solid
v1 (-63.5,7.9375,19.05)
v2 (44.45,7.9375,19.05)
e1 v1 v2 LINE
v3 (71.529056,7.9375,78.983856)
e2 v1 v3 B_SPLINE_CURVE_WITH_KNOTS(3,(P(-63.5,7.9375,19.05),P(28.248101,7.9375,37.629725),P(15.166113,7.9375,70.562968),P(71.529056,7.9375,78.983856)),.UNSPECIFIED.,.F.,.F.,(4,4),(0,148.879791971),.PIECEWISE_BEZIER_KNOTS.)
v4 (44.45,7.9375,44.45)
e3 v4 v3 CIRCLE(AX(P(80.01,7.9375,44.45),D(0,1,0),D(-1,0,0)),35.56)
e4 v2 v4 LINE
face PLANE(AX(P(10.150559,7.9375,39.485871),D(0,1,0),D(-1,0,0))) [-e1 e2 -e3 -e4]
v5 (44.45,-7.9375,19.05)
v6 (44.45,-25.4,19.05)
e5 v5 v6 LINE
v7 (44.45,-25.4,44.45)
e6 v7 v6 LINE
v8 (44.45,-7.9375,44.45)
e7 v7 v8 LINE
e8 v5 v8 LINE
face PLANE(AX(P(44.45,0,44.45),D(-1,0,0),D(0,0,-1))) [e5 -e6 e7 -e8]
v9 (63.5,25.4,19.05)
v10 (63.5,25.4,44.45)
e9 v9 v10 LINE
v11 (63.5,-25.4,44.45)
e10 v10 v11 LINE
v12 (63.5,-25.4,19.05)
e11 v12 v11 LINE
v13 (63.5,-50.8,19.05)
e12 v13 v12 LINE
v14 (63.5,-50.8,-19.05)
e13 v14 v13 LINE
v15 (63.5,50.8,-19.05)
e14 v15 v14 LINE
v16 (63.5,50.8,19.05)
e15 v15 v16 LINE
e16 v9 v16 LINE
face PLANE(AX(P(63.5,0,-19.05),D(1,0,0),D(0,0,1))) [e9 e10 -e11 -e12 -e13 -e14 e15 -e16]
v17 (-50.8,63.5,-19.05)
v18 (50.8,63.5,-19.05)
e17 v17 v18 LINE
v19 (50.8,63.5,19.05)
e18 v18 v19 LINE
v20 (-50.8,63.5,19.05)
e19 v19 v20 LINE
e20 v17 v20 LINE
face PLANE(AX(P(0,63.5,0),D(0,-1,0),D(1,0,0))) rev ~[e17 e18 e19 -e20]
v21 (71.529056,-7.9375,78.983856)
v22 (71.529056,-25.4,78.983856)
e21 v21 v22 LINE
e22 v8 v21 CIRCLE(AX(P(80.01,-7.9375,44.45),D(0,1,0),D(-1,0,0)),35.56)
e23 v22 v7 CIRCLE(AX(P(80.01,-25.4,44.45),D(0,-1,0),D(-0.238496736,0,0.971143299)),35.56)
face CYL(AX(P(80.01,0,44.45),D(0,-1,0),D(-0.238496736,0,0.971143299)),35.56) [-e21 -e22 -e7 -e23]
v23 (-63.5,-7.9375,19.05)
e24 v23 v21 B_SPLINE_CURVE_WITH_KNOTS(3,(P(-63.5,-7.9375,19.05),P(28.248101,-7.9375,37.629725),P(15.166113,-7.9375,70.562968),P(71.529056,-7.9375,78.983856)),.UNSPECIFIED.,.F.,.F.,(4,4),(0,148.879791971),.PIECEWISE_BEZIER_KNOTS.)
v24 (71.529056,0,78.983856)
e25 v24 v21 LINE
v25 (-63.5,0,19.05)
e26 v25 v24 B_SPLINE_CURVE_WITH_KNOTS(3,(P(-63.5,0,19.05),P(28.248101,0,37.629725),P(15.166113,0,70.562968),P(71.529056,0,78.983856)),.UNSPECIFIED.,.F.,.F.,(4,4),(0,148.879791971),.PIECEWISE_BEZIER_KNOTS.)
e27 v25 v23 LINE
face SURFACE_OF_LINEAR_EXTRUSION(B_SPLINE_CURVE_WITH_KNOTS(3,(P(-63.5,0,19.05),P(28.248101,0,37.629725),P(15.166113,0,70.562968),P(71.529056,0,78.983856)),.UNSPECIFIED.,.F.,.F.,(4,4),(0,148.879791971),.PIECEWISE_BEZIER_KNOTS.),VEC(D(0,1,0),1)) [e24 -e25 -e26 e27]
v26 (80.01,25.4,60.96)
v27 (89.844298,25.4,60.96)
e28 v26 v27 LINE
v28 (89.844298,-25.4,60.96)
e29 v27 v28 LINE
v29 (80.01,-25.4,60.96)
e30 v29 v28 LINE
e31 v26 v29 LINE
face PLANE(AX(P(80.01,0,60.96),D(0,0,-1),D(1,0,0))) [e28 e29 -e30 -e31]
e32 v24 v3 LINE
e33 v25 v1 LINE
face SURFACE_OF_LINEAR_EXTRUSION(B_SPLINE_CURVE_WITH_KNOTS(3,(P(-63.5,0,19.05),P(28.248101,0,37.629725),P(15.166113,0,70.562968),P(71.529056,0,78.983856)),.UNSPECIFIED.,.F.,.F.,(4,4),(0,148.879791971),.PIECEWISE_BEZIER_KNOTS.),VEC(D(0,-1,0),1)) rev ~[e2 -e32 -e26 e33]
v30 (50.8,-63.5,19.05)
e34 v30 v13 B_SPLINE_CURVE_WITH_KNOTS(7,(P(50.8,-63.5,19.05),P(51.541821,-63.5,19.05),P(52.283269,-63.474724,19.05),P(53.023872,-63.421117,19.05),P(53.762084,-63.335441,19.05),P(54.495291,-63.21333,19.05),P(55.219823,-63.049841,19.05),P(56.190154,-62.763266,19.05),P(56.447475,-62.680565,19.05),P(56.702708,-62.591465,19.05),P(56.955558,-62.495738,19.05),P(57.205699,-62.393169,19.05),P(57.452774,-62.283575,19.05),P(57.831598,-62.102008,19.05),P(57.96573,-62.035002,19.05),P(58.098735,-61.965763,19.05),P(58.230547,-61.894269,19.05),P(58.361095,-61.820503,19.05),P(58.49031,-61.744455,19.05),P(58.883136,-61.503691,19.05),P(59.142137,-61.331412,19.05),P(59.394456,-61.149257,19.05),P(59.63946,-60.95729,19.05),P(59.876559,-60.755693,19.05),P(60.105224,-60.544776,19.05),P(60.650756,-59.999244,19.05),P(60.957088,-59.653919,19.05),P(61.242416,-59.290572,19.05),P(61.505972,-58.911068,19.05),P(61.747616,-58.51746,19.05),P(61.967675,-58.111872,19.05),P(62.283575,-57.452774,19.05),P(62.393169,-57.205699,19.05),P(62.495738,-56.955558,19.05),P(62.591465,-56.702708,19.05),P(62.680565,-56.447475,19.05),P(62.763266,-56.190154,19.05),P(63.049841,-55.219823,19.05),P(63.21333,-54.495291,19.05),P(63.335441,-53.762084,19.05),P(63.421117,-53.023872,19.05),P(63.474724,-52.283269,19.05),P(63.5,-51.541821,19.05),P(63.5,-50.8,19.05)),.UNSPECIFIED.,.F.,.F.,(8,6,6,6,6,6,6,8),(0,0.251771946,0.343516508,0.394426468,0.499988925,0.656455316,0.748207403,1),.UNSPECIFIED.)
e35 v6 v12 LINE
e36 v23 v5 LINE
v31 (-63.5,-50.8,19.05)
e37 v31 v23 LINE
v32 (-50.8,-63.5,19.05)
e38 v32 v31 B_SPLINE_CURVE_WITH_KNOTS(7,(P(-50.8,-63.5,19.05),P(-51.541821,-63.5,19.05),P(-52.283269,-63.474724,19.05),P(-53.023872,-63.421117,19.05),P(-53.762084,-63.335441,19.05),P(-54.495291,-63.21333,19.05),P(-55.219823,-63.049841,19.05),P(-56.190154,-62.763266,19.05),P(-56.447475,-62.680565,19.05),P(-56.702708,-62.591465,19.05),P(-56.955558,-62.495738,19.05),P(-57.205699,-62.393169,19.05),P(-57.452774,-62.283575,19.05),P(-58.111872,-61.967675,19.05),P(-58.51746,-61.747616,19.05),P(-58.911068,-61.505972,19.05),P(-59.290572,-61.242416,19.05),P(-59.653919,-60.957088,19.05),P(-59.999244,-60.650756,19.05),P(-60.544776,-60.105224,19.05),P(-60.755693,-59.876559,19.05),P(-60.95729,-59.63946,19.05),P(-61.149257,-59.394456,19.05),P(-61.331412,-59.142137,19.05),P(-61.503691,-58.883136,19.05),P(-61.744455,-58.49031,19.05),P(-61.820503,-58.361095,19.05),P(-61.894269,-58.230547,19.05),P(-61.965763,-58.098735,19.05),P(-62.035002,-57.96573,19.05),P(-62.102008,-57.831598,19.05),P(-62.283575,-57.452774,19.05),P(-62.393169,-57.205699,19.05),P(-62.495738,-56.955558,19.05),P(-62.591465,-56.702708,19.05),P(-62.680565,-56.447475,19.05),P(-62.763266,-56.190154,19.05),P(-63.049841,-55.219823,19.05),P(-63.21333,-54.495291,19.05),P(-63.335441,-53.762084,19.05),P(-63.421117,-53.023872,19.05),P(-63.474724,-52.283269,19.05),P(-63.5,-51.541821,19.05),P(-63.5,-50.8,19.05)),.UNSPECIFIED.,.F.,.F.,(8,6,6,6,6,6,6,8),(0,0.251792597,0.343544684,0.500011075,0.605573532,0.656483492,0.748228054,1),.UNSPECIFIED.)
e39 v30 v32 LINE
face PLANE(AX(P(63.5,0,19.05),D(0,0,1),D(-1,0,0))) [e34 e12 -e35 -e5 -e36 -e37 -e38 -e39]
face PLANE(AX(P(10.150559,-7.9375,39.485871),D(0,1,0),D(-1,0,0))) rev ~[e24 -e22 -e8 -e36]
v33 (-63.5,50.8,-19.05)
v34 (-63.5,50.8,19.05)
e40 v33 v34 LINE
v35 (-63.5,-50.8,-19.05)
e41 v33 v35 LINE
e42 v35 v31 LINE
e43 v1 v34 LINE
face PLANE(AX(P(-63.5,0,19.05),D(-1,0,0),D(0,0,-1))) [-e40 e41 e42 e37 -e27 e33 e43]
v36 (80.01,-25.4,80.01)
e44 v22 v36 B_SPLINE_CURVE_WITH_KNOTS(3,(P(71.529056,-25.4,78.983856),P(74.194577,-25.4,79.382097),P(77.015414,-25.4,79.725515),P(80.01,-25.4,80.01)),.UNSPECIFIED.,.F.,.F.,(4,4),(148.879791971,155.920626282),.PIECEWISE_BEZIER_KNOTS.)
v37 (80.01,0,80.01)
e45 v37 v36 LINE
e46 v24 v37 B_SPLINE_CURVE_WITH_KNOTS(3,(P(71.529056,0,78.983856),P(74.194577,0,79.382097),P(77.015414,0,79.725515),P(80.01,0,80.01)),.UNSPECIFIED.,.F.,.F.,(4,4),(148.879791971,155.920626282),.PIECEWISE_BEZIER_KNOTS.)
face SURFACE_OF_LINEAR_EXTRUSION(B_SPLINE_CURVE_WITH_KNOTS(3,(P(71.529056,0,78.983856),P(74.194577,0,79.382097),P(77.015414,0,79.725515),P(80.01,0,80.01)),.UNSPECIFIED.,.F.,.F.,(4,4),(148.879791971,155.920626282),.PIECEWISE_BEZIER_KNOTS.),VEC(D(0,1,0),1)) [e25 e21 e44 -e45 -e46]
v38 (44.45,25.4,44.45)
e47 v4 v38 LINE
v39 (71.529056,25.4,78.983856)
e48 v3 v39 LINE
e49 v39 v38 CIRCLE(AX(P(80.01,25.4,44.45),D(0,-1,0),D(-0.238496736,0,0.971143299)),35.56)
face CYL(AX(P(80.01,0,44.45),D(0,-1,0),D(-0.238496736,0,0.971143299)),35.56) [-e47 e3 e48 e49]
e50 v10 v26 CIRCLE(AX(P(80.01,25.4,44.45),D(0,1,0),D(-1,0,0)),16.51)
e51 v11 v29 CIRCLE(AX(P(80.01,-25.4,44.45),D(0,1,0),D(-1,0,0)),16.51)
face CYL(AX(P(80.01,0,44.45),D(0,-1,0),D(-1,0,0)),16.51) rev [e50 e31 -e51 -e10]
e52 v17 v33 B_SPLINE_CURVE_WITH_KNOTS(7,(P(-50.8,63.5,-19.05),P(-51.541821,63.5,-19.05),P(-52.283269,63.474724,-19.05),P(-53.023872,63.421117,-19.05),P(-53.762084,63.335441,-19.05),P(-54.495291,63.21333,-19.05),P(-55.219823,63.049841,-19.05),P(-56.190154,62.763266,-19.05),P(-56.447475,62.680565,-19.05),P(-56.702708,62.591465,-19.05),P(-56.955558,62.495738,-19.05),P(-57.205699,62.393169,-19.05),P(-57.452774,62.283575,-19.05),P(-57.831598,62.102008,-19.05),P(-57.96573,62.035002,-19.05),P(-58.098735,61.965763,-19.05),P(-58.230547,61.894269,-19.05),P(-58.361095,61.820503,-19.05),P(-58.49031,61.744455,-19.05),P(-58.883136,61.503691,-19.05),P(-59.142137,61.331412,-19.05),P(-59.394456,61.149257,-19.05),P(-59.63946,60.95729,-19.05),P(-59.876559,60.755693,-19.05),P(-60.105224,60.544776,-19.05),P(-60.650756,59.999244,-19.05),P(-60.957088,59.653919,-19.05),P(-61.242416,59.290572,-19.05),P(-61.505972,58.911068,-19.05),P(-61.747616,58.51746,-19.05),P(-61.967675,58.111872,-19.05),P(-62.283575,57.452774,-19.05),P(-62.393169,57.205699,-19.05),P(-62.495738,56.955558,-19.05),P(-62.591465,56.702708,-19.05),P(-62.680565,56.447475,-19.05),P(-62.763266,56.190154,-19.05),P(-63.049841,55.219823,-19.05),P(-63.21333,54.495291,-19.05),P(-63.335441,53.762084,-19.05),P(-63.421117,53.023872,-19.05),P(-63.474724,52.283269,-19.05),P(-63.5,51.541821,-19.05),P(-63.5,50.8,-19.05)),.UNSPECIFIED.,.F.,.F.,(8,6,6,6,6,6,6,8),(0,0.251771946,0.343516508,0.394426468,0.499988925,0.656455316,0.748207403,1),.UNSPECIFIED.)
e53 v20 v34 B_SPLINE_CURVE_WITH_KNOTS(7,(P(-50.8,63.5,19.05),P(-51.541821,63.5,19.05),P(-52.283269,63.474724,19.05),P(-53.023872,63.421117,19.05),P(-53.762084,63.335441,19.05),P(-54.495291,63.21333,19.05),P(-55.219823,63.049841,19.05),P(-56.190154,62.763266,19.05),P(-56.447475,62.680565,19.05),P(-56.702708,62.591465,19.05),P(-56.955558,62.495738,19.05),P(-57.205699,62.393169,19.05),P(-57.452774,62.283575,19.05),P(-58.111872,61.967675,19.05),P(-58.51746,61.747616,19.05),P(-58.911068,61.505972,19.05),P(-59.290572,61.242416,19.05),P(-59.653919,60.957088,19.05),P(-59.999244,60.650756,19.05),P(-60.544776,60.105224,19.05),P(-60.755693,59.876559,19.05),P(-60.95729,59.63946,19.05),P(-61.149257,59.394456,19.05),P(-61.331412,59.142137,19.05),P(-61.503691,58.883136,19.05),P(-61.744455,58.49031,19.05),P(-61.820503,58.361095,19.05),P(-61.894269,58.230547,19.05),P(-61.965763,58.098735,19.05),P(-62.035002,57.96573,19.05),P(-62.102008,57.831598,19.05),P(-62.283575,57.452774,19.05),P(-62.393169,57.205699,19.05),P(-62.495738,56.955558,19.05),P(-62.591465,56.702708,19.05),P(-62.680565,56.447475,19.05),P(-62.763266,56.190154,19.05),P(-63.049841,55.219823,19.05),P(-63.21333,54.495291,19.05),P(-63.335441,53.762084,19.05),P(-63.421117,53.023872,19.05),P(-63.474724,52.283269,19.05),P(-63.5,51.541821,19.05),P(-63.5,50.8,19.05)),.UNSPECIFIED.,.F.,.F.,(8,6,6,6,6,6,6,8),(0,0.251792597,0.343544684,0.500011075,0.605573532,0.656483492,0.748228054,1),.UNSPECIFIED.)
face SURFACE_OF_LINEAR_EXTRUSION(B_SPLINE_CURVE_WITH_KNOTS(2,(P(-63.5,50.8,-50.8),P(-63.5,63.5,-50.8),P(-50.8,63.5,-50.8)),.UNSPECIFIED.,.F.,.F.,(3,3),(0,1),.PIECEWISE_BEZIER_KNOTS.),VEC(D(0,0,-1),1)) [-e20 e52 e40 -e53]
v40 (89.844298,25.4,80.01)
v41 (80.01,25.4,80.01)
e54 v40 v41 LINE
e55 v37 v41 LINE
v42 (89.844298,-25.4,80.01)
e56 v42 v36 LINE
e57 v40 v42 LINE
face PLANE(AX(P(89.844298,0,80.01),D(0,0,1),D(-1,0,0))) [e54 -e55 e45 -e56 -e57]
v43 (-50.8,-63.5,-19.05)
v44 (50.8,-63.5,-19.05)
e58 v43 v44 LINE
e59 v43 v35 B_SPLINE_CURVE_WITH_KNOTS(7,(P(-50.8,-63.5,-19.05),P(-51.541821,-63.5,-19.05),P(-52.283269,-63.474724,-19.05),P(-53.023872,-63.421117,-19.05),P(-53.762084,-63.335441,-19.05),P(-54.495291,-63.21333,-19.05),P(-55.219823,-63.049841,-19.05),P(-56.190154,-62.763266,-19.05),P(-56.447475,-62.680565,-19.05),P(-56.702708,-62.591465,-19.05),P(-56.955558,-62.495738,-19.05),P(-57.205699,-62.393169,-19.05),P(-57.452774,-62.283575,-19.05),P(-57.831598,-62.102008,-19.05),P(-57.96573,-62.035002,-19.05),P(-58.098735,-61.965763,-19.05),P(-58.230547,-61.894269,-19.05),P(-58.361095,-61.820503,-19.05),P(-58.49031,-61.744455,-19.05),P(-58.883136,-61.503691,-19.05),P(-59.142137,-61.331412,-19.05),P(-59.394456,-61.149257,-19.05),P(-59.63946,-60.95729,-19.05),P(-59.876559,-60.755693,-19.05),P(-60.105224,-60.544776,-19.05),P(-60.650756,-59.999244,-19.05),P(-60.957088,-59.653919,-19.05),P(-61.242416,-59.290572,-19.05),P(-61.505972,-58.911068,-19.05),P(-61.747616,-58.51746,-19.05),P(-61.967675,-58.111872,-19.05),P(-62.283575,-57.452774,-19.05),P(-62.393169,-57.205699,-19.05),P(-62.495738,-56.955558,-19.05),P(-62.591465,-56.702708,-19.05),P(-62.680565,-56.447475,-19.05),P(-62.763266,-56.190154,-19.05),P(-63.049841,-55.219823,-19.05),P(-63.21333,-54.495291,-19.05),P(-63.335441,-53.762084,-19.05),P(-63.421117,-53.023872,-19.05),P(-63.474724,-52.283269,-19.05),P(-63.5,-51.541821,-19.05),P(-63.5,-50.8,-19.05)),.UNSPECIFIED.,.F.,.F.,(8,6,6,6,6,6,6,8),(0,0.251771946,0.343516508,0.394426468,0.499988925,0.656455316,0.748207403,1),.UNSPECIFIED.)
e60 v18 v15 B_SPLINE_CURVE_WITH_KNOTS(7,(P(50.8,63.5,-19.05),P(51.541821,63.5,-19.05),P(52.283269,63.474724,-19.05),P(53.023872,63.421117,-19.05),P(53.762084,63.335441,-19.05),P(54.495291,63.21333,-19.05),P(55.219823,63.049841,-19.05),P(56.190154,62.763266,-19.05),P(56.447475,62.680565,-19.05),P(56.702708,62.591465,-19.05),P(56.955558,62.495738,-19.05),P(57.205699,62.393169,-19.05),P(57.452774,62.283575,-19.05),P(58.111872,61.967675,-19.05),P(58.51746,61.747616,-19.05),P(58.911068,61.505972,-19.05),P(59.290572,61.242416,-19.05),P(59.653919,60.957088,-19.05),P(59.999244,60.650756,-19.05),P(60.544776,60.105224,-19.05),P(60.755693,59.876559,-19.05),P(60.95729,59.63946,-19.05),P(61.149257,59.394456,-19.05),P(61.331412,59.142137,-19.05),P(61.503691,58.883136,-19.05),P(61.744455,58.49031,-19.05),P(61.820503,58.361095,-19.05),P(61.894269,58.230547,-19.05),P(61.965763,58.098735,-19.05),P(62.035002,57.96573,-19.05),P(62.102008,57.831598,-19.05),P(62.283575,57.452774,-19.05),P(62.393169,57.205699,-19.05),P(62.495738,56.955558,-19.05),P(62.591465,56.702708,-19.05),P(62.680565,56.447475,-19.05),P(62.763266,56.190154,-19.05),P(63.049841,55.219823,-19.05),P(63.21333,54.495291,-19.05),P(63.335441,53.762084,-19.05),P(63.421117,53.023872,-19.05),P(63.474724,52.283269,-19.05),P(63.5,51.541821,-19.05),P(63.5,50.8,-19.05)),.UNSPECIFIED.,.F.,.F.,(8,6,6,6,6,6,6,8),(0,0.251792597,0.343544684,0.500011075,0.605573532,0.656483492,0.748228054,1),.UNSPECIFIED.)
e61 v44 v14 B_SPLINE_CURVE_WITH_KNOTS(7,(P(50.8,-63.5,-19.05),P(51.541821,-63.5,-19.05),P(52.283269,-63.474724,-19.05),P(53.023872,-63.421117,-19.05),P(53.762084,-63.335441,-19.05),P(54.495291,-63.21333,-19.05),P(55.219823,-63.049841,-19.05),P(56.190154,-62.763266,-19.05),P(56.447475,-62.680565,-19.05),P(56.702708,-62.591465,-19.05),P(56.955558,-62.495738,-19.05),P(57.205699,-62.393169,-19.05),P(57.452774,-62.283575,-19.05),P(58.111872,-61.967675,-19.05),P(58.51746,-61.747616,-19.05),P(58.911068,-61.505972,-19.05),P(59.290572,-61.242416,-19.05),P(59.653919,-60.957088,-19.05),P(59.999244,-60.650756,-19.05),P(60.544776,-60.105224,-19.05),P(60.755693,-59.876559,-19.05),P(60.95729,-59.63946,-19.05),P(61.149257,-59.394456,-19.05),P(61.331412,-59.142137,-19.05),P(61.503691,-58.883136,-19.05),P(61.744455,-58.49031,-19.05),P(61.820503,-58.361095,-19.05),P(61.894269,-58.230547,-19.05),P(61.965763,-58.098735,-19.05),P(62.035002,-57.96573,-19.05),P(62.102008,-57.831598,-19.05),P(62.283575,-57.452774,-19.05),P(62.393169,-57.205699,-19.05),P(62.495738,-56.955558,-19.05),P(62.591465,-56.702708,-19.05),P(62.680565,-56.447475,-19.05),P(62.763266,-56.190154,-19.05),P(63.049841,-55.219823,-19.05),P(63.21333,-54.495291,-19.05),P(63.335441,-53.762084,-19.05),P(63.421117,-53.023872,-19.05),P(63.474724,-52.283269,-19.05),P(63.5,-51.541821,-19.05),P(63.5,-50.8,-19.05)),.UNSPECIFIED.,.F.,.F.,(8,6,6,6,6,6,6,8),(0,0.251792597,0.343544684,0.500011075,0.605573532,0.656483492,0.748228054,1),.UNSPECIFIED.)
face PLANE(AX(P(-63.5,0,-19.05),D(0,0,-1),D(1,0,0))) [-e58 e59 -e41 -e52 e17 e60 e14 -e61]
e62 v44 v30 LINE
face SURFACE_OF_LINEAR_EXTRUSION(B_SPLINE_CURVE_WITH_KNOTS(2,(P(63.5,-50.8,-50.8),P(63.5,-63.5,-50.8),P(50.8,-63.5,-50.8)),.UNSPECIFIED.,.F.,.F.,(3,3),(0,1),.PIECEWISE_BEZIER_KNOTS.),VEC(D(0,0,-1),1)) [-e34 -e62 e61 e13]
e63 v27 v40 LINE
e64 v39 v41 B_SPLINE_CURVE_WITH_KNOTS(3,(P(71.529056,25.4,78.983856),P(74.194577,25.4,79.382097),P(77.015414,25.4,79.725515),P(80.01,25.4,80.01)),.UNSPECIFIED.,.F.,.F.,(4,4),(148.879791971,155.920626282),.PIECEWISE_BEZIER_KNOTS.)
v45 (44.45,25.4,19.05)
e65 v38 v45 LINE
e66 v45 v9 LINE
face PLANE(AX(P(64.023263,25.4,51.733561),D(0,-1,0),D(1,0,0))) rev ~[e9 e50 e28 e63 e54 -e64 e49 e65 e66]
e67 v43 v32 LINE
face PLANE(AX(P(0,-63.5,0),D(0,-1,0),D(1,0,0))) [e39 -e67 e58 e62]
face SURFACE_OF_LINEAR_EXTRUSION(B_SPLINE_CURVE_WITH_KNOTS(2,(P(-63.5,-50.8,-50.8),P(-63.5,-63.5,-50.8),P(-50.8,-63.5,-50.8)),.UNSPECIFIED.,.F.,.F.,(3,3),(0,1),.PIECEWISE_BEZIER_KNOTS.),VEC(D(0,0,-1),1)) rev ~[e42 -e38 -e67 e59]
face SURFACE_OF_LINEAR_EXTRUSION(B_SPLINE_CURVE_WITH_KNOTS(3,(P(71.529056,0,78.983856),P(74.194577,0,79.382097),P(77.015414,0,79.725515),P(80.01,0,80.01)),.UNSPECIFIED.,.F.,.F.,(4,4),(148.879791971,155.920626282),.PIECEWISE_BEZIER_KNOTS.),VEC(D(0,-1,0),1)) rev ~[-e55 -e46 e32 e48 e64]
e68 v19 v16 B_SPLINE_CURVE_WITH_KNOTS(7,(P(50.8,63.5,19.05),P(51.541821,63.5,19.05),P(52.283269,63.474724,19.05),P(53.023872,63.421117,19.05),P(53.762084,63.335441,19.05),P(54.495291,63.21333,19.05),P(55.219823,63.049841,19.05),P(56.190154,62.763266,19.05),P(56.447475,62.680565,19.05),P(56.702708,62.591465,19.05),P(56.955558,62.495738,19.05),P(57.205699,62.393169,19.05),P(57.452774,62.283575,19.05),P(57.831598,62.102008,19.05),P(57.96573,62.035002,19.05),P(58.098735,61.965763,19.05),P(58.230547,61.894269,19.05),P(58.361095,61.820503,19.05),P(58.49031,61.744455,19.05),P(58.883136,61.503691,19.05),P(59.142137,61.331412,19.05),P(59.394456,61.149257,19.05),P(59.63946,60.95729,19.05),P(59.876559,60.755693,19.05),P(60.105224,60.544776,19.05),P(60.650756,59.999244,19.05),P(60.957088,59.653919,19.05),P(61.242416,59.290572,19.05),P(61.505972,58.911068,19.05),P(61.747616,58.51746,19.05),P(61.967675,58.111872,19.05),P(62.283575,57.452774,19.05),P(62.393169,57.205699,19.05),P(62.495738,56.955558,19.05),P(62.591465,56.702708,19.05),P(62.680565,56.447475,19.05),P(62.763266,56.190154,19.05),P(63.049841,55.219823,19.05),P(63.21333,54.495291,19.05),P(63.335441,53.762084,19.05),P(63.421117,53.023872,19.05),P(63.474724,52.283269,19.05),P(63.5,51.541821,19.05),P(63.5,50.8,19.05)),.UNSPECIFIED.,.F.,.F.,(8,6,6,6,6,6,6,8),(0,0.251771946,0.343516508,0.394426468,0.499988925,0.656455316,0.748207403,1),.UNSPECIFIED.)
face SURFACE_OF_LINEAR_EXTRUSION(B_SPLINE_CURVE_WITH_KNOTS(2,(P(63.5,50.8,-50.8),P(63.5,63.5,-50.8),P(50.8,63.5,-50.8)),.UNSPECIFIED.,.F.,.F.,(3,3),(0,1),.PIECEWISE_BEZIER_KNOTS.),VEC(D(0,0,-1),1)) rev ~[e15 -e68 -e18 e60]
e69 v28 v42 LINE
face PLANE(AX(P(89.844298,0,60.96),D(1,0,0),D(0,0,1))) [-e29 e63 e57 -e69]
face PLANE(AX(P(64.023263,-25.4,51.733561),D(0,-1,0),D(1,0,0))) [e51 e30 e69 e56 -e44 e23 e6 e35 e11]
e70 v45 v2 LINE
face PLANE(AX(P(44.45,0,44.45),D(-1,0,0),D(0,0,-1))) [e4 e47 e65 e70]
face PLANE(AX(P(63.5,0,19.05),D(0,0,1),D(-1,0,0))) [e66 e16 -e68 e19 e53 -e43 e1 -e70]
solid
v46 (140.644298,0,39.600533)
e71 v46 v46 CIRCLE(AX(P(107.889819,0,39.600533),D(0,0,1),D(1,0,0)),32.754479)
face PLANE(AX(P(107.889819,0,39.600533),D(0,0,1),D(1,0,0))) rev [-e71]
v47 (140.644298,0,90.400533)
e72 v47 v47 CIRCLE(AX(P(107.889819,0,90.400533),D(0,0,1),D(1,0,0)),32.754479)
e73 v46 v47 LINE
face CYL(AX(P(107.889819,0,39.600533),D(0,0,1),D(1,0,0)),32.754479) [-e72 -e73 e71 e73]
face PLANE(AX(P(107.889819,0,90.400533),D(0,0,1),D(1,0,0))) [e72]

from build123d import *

# Parameters (mm, degrees)
F1_DEPTH    = 63.5
F2_DEPTH    = 25.4
F3_DEPTH    = 7.9375
F5_T1_DEPTH = 101.6


# Not quite as in the source:
# - a fillet or chamfer that OpenCascade refuses, or shapes differently, is made with other operations: its cross-section is extruded or revolved along the edge and cut away or added


with BuildPart() as f1:
    # F0 (on Front) → F1 (new body, symmetric)
    with BuildSketch(Plane.XZ):
        Polygon((44.45, 19.05), (-63.5, 19.05), (-63.5, -19.05), (63.5, -19.05), (63.5, 19.05), align=None)
    extrude(amount=F1_DEPTH, both=True)

    # F0 (on Front) → F2 (join, symmetric)
    with BuildSketch(Plane.XZ):
        with BuildLine():
            Line((44.45, 44.45), (44.45, 19.05))
            Line((44.45, 19.05), (63.5, 19.05))
            Line((63.5, 19.05), (63.5, 44.45))
            ThreePointArc((63.5, 44.45), (68.3356670426, 56.1243329574), (80.01, 60.96))
            Line((80.01, 60.96), (89.8442984975, 60.96))
            Line((89.8442984975, 60.96), (89.8442984975, 80.01))
            Line((89.8442984975, 80.01), (80.01, 80.01))
            add(Edge.make_bspline(
                [(71.5290560563, 78.9838557046), (74.194576587, 79.3820969631), (77.0154135084, 79.7255153509), (80.01, 80.01)],
                knots=[148.8797919707, 148.8797919707, 148.8797919707, 148.8797919707, 155.9206262815, 155.9206262815, 155.9206262815, 155.9206262815], degree=3))
            ThreePointArc((71.5290560563, 78.9838557046), (52.0270054619, 66.3923247784), (44.45, 44.45))
        make_face()
    extrude(amount=F2_DEPTH, both=True)

    # F0 (on Front) → F3 (join, symmetric)
    with BuildSketch(Plane.XZ):
        with BuildLine():
            add(Edge.make_bspline(
                [(-63.5, 19.05), (28.2481007656, 37.6297254633), (15.1661131725, 70.5629679071), (71.5290560563, 78.9838557046)],
                knots=[0, 0, 0, 0, 148.8797919707, 148.8797919707, 148.8797919707, 148.8797919707], degree=3))
            Line((-63.5, 19.05), (44.45, 19.05))
            Line((44.45, 19.05), (44.45, 44.45))
            ThreePointArc((44.45, 44.45), (52.0270054619, 66.3923247784), (71.5290560563, 78.9838557046))
        make_face()
    extrude(amount=F3_DEPTH, both=True)

    # F5: fillet of radius 12.7 on 4 edges, made by hand

    # F5_s2 → F5_t1 (cut)
    with BuildSketch(Plane.XY.offset(-50.8)):
        with BuildLine():
            add(Edge.make_bspline(
                [(-63.5, -50.8), (-63.5, -63.5), (-50.8, -63.5)],
                knots=[0, 0, 0, 1, 1, 1], degree=2, weights=[1, 1, 1]))
            Line((-50.8, -63.5), (-63.5, -63.5))
            Line((-63.5, -63.5), (-63.5, -50.8))
        make_face()
        with BuildLine():
            add(Edge.make_bspline(
                [(63.5, -50.8), (63.5, -63.5), (50.8, -63.5)],
                knots=[0, 0, 0, 1, 1, 1], degree=2, weights=[1, 1, 1]))
            Line((50.8, -63.5), (63.5, -63.5))
            Line((63.5, -63.5), (63.5, -50.8))
        make_face()
        with BuildLine():
            add(Edge.make_bspline(
                [(63.5, 50.8), (63.5, 63.5), (50.8, 63.5)],
                knots=[0, 0, 0, 1, 1, 1], degree=2, weights=[1, 1, 1]))
            Line((50.8, 63.5), (63.5, 63.5))
            Line((63.5, 63.5), (63.5, 50.8))
        make_face()
        with BuildLine():
            add(Edge.make_bspline(
                [(-63.5, 50.8), (-63.5, 63.5), (-50.8, 63.5)],
                knots=[0, 0, 0, 1, 1, 1], degree=2, weights=[1, 1, 1]))
            Line((-50.8, 63.5), (-63.5, 63.5))
            Line((-63.5, 63.5), (-63.5, 50.8))
        make_face()
    extrude(amount=F5_T1_DEPTH, mode=Mode.SUBTRACT)


with BuildPart() as f4:
    # F0 (on Front) → F4 (revolve)
    with BuildSketch(Plane.XZ):
        Polygon((107.8898191703, 90.4005332853), (107.8898191703, 80.01), (107.8898191703, 60.96), (107.8898191703, 39.6005332853), (140.6442984975, 39.6005332853), (140.6442984975, 90.4005332853), align=None)
    revolve(axis=Axis((107.8898191703, 0, 65.0005332853), (0, 0, 1)))


solid = Compound([f1.part, f4.part])
